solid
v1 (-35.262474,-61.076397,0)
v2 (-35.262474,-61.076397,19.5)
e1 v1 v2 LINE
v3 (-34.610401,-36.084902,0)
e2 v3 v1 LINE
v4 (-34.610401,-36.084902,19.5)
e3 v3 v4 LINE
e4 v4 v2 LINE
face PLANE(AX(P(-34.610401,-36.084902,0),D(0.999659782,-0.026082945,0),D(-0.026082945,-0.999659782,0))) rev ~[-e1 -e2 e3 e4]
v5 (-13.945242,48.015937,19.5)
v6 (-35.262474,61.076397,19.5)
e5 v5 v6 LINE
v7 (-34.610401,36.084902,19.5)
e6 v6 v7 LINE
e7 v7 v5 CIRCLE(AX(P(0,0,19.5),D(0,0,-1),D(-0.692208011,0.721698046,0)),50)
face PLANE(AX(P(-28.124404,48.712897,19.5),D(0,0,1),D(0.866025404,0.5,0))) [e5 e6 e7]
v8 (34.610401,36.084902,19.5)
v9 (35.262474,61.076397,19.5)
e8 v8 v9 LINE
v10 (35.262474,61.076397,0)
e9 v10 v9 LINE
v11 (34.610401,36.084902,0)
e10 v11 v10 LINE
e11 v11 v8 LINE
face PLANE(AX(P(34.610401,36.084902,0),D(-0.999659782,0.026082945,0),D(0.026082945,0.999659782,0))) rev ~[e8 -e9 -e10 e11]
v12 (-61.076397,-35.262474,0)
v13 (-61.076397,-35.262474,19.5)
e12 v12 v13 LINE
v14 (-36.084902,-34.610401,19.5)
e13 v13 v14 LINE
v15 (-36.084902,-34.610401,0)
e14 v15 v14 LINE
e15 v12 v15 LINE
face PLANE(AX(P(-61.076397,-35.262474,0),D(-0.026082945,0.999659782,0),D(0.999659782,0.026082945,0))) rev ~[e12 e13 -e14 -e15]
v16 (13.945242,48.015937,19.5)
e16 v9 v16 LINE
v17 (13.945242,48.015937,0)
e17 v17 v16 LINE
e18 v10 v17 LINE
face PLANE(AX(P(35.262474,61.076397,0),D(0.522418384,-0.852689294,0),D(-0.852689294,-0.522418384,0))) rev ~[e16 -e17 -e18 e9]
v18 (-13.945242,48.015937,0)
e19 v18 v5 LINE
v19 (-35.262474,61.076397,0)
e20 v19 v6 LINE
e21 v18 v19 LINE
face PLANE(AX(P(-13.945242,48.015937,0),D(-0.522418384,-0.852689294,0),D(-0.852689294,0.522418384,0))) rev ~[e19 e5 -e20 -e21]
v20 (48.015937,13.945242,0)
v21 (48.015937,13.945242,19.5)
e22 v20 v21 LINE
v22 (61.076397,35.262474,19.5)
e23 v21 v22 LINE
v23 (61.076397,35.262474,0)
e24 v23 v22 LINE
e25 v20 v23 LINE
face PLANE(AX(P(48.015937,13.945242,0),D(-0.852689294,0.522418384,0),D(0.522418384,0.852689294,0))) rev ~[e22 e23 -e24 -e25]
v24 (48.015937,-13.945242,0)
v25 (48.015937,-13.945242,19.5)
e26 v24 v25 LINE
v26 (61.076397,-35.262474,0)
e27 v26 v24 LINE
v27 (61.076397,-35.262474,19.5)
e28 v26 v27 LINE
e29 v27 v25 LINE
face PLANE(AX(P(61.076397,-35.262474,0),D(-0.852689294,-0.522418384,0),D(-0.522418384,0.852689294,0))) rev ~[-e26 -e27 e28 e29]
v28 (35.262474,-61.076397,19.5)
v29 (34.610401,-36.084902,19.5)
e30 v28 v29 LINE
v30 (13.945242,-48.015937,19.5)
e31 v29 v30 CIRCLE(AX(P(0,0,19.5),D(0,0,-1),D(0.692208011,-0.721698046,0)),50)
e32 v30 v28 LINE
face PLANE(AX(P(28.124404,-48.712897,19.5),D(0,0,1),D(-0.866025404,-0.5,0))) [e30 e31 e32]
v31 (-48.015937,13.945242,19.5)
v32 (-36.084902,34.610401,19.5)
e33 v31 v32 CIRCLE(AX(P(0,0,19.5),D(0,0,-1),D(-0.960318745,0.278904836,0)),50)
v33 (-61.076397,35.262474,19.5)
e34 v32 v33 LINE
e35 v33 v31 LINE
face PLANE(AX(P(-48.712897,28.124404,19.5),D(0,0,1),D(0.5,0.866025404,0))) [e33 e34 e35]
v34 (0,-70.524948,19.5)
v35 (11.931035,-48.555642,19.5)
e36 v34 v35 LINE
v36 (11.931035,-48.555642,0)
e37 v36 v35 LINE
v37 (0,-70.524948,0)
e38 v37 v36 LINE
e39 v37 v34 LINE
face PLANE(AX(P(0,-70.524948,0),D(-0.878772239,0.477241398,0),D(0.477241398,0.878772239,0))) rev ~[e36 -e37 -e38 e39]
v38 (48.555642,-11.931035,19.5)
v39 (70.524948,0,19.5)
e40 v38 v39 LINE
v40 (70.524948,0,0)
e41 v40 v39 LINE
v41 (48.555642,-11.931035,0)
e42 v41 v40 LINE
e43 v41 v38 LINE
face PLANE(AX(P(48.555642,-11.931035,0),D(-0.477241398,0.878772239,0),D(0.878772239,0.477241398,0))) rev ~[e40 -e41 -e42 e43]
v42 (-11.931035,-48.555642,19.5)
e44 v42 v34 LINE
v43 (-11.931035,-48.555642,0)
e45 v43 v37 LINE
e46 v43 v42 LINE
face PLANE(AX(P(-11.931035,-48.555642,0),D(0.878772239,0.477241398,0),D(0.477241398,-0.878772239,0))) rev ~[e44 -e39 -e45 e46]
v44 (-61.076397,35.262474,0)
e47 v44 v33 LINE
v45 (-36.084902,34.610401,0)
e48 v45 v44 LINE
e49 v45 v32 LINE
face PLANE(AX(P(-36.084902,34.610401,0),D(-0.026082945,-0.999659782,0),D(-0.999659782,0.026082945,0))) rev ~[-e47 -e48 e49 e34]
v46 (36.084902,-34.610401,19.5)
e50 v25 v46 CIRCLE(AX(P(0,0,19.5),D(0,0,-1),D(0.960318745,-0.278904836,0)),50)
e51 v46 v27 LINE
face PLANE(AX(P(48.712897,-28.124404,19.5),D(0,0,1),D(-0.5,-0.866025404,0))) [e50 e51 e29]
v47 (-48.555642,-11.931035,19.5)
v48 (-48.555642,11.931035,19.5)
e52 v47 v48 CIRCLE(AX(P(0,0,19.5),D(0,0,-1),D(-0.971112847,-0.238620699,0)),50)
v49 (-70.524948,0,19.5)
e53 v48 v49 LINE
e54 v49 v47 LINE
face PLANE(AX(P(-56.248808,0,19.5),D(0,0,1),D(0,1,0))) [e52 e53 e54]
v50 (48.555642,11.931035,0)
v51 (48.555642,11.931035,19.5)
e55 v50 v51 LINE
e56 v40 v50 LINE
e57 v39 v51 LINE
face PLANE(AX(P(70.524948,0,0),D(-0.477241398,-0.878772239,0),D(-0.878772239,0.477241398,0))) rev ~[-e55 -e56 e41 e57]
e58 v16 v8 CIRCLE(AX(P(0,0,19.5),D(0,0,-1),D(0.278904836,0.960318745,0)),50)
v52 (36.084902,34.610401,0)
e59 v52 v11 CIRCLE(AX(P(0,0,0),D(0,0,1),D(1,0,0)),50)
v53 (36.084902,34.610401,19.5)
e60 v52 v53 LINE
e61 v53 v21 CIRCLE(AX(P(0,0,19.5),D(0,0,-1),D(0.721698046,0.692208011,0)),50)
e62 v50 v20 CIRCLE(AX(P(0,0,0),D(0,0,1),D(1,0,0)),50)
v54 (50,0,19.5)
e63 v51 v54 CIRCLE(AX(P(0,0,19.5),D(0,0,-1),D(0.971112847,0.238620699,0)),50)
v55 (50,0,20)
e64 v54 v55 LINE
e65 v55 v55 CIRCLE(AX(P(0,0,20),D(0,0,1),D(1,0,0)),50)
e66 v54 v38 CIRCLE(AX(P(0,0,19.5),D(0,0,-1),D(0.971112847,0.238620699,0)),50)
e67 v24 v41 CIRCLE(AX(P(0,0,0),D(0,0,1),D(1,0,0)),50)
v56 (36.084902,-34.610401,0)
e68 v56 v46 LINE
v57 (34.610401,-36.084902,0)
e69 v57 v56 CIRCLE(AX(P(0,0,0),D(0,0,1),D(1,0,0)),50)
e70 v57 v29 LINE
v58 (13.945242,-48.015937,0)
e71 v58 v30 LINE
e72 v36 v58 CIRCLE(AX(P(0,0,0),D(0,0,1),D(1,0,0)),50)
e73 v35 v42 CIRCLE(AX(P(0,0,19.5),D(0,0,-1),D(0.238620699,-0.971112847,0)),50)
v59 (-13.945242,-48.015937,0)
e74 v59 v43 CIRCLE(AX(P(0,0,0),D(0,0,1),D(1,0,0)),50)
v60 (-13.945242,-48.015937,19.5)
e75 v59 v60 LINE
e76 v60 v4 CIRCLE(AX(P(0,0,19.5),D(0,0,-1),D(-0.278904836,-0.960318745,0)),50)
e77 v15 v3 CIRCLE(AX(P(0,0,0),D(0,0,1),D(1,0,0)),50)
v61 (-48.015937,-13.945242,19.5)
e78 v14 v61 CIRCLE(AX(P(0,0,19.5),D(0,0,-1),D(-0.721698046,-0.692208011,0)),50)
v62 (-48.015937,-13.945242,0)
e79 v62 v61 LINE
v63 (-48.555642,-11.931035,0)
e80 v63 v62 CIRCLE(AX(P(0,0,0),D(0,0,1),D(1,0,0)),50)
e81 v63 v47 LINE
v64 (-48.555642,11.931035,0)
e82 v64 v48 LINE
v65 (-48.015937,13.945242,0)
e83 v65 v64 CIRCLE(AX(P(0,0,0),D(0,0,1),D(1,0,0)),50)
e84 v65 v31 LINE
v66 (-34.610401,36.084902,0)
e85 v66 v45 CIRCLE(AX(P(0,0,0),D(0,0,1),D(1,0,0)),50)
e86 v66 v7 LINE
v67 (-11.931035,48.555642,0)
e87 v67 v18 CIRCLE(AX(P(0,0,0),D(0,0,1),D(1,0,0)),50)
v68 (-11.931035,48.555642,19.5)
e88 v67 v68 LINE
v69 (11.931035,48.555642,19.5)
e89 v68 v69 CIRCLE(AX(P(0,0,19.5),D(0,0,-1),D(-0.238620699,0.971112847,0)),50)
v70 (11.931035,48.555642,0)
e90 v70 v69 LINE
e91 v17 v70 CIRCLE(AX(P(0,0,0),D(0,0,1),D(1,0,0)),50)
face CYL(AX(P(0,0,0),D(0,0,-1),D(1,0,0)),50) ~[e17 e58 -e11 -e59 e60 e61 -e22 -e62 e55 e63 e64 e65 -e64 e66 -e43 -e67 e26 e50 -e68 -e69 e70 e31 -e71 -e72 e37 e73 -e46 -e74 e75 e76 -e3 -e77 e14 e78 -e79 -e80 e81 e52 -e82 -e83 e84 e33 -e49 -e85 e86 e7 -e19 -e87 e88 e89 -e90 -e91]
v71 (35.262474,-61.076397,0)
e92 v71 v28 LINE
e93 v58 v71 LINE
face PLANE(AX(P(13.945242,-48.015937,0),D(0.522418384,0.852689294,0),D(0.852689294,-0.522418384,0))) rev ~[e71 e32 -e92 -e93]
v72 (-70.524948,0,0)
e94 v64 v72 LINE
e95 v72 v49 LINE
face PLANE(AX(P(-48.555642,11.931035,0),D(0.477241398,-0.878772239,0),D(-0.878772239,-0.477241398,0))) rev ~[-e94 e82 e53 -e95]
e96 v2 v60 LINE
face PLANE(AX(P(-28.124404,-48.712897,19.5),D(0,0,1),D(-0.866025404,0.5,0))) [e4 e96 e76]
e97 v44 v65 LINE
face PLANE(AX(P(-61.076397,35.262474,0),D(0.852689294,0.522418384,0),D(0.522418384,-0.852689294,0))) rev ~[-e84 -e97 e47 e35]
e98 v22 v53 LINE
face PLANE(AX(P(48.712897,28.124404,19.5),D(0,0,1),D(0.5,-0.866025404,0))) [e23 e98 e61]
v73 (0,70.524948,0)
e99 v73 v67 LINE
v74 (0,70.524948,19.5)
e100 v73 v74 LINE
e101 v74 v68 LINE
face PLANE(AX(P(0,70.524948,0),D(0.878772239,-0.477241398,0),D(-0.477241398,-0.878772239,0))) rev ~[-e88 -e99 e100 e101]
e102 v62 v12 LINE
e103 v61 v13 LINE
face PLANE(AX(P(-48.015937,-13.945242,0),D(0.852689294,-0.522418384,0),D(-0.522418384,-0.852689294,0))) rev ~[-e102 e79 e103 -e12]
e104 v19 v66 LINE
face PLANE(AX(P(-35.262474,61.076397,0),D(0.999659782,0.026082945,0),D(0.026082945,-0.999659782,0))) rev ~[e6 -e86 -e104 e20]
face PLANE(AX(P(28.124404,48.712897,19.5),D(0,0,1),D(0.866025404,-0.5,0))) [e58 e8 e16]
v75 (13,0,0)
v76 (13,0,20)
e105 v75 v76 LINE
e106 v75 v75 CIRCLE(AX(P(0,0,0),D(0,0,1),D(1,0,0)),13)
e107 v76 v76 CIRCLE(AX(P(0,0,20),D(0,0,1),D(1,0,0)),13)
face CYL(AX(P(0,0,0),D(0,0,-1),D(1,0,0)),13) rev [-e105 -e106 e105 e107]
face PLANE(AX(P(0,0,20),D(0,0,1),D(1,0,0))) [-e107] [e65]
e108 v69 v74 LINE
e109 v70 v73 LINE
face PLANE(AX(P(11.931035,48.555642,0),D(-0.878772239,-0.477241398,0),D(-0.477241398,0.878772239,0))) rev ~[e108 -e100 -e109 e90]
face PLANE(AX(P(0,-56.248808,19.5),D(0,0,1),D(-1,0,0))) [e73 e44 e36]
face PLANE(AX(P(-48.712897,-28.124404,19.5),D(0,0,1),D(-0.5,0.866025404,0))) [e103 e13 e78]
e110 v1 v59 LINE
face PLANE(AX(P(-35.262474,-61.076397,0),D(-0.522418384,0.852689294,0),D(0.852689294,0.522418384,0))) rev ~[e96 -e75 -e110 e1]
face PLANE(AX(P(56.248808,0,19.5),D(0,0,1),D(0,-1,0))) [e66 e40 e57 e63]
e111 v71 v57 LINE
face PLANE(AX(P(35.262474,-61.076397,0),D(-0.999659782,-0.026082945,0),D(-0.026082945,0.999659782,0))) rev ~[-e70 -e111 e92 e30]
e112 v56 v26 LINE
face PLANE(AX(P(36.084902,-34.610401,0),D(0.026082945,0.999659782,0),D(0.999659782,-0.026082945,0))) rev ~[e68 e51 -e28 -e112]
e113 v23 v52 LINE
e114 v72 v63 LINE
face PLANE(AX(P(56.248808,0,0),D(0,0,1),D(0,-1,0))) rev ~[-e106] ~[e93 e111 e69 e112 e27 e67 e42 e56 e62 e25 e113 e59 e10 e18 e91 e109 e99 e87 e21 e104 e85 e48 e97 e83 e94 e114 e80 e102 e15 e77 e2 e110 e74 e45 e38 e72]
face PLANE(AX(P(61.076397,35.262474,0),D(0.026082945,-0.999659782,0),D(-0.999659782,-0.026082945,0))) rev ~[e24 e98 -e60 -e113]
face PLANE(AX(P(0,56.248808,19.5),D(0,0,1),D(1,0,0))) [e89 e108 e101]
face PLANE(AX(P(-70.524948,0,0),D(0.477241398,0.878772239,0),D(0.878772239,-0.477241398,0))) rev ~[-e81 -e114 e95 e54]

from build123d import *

# Parameters (mm, degrees)
F0_R            = 50
F1_DEPTH        = 20
F2_R            = 13
F3_DEPTH        = 20
F5_DEPTH        = 19.5
F5_COPIES_COUNT = 12


# Not quite as in the source:
# - a pattern or mirror of a feature is missing from the dataset's text; its kind, count and spacing are read off the source's solid


with BuildPart() as f1:
    # F0 (on Top) → F1 (new body)
    with BuildSketch(Plane.XY):
        Circle(F0_R)
    extrude(amount=F1_DEPTH)

    # F2 (on Top) → F3 (cut)
    with BuildSketch(Plane.XY):
        Circle(F2_R)
    extrude(amount=F3_DEPTH, mode=Mode.SUBTRACT)

    # F4 (on Top) → F5 (join)
    with BuildSketch(Plane.XY):
        with BuildLine():
            Line((0, 70.5249483342), (-11.9310349513, 48.55564236))
            ThreePointArc((-11.9310349513, 48.55564236), (0, 50), (11.9310349513, 48.55564236))
            Line((11.9310349513, 48.55564236), (0, 70.5249483342))
        make_face()
    f5 = extrude(amount=F5_DEPTH)

    # F5_copies: F5 ×12 about axis
    f5_copies_axis = Axis((0, 0, 0), (0, 0, 1))
    for i in range(1, F5_COPIES_COUNT):
        add(f5.rotate(f5_copies_axis, i * 360 / F5_COPIES_COUNT))


solid = f1.part
